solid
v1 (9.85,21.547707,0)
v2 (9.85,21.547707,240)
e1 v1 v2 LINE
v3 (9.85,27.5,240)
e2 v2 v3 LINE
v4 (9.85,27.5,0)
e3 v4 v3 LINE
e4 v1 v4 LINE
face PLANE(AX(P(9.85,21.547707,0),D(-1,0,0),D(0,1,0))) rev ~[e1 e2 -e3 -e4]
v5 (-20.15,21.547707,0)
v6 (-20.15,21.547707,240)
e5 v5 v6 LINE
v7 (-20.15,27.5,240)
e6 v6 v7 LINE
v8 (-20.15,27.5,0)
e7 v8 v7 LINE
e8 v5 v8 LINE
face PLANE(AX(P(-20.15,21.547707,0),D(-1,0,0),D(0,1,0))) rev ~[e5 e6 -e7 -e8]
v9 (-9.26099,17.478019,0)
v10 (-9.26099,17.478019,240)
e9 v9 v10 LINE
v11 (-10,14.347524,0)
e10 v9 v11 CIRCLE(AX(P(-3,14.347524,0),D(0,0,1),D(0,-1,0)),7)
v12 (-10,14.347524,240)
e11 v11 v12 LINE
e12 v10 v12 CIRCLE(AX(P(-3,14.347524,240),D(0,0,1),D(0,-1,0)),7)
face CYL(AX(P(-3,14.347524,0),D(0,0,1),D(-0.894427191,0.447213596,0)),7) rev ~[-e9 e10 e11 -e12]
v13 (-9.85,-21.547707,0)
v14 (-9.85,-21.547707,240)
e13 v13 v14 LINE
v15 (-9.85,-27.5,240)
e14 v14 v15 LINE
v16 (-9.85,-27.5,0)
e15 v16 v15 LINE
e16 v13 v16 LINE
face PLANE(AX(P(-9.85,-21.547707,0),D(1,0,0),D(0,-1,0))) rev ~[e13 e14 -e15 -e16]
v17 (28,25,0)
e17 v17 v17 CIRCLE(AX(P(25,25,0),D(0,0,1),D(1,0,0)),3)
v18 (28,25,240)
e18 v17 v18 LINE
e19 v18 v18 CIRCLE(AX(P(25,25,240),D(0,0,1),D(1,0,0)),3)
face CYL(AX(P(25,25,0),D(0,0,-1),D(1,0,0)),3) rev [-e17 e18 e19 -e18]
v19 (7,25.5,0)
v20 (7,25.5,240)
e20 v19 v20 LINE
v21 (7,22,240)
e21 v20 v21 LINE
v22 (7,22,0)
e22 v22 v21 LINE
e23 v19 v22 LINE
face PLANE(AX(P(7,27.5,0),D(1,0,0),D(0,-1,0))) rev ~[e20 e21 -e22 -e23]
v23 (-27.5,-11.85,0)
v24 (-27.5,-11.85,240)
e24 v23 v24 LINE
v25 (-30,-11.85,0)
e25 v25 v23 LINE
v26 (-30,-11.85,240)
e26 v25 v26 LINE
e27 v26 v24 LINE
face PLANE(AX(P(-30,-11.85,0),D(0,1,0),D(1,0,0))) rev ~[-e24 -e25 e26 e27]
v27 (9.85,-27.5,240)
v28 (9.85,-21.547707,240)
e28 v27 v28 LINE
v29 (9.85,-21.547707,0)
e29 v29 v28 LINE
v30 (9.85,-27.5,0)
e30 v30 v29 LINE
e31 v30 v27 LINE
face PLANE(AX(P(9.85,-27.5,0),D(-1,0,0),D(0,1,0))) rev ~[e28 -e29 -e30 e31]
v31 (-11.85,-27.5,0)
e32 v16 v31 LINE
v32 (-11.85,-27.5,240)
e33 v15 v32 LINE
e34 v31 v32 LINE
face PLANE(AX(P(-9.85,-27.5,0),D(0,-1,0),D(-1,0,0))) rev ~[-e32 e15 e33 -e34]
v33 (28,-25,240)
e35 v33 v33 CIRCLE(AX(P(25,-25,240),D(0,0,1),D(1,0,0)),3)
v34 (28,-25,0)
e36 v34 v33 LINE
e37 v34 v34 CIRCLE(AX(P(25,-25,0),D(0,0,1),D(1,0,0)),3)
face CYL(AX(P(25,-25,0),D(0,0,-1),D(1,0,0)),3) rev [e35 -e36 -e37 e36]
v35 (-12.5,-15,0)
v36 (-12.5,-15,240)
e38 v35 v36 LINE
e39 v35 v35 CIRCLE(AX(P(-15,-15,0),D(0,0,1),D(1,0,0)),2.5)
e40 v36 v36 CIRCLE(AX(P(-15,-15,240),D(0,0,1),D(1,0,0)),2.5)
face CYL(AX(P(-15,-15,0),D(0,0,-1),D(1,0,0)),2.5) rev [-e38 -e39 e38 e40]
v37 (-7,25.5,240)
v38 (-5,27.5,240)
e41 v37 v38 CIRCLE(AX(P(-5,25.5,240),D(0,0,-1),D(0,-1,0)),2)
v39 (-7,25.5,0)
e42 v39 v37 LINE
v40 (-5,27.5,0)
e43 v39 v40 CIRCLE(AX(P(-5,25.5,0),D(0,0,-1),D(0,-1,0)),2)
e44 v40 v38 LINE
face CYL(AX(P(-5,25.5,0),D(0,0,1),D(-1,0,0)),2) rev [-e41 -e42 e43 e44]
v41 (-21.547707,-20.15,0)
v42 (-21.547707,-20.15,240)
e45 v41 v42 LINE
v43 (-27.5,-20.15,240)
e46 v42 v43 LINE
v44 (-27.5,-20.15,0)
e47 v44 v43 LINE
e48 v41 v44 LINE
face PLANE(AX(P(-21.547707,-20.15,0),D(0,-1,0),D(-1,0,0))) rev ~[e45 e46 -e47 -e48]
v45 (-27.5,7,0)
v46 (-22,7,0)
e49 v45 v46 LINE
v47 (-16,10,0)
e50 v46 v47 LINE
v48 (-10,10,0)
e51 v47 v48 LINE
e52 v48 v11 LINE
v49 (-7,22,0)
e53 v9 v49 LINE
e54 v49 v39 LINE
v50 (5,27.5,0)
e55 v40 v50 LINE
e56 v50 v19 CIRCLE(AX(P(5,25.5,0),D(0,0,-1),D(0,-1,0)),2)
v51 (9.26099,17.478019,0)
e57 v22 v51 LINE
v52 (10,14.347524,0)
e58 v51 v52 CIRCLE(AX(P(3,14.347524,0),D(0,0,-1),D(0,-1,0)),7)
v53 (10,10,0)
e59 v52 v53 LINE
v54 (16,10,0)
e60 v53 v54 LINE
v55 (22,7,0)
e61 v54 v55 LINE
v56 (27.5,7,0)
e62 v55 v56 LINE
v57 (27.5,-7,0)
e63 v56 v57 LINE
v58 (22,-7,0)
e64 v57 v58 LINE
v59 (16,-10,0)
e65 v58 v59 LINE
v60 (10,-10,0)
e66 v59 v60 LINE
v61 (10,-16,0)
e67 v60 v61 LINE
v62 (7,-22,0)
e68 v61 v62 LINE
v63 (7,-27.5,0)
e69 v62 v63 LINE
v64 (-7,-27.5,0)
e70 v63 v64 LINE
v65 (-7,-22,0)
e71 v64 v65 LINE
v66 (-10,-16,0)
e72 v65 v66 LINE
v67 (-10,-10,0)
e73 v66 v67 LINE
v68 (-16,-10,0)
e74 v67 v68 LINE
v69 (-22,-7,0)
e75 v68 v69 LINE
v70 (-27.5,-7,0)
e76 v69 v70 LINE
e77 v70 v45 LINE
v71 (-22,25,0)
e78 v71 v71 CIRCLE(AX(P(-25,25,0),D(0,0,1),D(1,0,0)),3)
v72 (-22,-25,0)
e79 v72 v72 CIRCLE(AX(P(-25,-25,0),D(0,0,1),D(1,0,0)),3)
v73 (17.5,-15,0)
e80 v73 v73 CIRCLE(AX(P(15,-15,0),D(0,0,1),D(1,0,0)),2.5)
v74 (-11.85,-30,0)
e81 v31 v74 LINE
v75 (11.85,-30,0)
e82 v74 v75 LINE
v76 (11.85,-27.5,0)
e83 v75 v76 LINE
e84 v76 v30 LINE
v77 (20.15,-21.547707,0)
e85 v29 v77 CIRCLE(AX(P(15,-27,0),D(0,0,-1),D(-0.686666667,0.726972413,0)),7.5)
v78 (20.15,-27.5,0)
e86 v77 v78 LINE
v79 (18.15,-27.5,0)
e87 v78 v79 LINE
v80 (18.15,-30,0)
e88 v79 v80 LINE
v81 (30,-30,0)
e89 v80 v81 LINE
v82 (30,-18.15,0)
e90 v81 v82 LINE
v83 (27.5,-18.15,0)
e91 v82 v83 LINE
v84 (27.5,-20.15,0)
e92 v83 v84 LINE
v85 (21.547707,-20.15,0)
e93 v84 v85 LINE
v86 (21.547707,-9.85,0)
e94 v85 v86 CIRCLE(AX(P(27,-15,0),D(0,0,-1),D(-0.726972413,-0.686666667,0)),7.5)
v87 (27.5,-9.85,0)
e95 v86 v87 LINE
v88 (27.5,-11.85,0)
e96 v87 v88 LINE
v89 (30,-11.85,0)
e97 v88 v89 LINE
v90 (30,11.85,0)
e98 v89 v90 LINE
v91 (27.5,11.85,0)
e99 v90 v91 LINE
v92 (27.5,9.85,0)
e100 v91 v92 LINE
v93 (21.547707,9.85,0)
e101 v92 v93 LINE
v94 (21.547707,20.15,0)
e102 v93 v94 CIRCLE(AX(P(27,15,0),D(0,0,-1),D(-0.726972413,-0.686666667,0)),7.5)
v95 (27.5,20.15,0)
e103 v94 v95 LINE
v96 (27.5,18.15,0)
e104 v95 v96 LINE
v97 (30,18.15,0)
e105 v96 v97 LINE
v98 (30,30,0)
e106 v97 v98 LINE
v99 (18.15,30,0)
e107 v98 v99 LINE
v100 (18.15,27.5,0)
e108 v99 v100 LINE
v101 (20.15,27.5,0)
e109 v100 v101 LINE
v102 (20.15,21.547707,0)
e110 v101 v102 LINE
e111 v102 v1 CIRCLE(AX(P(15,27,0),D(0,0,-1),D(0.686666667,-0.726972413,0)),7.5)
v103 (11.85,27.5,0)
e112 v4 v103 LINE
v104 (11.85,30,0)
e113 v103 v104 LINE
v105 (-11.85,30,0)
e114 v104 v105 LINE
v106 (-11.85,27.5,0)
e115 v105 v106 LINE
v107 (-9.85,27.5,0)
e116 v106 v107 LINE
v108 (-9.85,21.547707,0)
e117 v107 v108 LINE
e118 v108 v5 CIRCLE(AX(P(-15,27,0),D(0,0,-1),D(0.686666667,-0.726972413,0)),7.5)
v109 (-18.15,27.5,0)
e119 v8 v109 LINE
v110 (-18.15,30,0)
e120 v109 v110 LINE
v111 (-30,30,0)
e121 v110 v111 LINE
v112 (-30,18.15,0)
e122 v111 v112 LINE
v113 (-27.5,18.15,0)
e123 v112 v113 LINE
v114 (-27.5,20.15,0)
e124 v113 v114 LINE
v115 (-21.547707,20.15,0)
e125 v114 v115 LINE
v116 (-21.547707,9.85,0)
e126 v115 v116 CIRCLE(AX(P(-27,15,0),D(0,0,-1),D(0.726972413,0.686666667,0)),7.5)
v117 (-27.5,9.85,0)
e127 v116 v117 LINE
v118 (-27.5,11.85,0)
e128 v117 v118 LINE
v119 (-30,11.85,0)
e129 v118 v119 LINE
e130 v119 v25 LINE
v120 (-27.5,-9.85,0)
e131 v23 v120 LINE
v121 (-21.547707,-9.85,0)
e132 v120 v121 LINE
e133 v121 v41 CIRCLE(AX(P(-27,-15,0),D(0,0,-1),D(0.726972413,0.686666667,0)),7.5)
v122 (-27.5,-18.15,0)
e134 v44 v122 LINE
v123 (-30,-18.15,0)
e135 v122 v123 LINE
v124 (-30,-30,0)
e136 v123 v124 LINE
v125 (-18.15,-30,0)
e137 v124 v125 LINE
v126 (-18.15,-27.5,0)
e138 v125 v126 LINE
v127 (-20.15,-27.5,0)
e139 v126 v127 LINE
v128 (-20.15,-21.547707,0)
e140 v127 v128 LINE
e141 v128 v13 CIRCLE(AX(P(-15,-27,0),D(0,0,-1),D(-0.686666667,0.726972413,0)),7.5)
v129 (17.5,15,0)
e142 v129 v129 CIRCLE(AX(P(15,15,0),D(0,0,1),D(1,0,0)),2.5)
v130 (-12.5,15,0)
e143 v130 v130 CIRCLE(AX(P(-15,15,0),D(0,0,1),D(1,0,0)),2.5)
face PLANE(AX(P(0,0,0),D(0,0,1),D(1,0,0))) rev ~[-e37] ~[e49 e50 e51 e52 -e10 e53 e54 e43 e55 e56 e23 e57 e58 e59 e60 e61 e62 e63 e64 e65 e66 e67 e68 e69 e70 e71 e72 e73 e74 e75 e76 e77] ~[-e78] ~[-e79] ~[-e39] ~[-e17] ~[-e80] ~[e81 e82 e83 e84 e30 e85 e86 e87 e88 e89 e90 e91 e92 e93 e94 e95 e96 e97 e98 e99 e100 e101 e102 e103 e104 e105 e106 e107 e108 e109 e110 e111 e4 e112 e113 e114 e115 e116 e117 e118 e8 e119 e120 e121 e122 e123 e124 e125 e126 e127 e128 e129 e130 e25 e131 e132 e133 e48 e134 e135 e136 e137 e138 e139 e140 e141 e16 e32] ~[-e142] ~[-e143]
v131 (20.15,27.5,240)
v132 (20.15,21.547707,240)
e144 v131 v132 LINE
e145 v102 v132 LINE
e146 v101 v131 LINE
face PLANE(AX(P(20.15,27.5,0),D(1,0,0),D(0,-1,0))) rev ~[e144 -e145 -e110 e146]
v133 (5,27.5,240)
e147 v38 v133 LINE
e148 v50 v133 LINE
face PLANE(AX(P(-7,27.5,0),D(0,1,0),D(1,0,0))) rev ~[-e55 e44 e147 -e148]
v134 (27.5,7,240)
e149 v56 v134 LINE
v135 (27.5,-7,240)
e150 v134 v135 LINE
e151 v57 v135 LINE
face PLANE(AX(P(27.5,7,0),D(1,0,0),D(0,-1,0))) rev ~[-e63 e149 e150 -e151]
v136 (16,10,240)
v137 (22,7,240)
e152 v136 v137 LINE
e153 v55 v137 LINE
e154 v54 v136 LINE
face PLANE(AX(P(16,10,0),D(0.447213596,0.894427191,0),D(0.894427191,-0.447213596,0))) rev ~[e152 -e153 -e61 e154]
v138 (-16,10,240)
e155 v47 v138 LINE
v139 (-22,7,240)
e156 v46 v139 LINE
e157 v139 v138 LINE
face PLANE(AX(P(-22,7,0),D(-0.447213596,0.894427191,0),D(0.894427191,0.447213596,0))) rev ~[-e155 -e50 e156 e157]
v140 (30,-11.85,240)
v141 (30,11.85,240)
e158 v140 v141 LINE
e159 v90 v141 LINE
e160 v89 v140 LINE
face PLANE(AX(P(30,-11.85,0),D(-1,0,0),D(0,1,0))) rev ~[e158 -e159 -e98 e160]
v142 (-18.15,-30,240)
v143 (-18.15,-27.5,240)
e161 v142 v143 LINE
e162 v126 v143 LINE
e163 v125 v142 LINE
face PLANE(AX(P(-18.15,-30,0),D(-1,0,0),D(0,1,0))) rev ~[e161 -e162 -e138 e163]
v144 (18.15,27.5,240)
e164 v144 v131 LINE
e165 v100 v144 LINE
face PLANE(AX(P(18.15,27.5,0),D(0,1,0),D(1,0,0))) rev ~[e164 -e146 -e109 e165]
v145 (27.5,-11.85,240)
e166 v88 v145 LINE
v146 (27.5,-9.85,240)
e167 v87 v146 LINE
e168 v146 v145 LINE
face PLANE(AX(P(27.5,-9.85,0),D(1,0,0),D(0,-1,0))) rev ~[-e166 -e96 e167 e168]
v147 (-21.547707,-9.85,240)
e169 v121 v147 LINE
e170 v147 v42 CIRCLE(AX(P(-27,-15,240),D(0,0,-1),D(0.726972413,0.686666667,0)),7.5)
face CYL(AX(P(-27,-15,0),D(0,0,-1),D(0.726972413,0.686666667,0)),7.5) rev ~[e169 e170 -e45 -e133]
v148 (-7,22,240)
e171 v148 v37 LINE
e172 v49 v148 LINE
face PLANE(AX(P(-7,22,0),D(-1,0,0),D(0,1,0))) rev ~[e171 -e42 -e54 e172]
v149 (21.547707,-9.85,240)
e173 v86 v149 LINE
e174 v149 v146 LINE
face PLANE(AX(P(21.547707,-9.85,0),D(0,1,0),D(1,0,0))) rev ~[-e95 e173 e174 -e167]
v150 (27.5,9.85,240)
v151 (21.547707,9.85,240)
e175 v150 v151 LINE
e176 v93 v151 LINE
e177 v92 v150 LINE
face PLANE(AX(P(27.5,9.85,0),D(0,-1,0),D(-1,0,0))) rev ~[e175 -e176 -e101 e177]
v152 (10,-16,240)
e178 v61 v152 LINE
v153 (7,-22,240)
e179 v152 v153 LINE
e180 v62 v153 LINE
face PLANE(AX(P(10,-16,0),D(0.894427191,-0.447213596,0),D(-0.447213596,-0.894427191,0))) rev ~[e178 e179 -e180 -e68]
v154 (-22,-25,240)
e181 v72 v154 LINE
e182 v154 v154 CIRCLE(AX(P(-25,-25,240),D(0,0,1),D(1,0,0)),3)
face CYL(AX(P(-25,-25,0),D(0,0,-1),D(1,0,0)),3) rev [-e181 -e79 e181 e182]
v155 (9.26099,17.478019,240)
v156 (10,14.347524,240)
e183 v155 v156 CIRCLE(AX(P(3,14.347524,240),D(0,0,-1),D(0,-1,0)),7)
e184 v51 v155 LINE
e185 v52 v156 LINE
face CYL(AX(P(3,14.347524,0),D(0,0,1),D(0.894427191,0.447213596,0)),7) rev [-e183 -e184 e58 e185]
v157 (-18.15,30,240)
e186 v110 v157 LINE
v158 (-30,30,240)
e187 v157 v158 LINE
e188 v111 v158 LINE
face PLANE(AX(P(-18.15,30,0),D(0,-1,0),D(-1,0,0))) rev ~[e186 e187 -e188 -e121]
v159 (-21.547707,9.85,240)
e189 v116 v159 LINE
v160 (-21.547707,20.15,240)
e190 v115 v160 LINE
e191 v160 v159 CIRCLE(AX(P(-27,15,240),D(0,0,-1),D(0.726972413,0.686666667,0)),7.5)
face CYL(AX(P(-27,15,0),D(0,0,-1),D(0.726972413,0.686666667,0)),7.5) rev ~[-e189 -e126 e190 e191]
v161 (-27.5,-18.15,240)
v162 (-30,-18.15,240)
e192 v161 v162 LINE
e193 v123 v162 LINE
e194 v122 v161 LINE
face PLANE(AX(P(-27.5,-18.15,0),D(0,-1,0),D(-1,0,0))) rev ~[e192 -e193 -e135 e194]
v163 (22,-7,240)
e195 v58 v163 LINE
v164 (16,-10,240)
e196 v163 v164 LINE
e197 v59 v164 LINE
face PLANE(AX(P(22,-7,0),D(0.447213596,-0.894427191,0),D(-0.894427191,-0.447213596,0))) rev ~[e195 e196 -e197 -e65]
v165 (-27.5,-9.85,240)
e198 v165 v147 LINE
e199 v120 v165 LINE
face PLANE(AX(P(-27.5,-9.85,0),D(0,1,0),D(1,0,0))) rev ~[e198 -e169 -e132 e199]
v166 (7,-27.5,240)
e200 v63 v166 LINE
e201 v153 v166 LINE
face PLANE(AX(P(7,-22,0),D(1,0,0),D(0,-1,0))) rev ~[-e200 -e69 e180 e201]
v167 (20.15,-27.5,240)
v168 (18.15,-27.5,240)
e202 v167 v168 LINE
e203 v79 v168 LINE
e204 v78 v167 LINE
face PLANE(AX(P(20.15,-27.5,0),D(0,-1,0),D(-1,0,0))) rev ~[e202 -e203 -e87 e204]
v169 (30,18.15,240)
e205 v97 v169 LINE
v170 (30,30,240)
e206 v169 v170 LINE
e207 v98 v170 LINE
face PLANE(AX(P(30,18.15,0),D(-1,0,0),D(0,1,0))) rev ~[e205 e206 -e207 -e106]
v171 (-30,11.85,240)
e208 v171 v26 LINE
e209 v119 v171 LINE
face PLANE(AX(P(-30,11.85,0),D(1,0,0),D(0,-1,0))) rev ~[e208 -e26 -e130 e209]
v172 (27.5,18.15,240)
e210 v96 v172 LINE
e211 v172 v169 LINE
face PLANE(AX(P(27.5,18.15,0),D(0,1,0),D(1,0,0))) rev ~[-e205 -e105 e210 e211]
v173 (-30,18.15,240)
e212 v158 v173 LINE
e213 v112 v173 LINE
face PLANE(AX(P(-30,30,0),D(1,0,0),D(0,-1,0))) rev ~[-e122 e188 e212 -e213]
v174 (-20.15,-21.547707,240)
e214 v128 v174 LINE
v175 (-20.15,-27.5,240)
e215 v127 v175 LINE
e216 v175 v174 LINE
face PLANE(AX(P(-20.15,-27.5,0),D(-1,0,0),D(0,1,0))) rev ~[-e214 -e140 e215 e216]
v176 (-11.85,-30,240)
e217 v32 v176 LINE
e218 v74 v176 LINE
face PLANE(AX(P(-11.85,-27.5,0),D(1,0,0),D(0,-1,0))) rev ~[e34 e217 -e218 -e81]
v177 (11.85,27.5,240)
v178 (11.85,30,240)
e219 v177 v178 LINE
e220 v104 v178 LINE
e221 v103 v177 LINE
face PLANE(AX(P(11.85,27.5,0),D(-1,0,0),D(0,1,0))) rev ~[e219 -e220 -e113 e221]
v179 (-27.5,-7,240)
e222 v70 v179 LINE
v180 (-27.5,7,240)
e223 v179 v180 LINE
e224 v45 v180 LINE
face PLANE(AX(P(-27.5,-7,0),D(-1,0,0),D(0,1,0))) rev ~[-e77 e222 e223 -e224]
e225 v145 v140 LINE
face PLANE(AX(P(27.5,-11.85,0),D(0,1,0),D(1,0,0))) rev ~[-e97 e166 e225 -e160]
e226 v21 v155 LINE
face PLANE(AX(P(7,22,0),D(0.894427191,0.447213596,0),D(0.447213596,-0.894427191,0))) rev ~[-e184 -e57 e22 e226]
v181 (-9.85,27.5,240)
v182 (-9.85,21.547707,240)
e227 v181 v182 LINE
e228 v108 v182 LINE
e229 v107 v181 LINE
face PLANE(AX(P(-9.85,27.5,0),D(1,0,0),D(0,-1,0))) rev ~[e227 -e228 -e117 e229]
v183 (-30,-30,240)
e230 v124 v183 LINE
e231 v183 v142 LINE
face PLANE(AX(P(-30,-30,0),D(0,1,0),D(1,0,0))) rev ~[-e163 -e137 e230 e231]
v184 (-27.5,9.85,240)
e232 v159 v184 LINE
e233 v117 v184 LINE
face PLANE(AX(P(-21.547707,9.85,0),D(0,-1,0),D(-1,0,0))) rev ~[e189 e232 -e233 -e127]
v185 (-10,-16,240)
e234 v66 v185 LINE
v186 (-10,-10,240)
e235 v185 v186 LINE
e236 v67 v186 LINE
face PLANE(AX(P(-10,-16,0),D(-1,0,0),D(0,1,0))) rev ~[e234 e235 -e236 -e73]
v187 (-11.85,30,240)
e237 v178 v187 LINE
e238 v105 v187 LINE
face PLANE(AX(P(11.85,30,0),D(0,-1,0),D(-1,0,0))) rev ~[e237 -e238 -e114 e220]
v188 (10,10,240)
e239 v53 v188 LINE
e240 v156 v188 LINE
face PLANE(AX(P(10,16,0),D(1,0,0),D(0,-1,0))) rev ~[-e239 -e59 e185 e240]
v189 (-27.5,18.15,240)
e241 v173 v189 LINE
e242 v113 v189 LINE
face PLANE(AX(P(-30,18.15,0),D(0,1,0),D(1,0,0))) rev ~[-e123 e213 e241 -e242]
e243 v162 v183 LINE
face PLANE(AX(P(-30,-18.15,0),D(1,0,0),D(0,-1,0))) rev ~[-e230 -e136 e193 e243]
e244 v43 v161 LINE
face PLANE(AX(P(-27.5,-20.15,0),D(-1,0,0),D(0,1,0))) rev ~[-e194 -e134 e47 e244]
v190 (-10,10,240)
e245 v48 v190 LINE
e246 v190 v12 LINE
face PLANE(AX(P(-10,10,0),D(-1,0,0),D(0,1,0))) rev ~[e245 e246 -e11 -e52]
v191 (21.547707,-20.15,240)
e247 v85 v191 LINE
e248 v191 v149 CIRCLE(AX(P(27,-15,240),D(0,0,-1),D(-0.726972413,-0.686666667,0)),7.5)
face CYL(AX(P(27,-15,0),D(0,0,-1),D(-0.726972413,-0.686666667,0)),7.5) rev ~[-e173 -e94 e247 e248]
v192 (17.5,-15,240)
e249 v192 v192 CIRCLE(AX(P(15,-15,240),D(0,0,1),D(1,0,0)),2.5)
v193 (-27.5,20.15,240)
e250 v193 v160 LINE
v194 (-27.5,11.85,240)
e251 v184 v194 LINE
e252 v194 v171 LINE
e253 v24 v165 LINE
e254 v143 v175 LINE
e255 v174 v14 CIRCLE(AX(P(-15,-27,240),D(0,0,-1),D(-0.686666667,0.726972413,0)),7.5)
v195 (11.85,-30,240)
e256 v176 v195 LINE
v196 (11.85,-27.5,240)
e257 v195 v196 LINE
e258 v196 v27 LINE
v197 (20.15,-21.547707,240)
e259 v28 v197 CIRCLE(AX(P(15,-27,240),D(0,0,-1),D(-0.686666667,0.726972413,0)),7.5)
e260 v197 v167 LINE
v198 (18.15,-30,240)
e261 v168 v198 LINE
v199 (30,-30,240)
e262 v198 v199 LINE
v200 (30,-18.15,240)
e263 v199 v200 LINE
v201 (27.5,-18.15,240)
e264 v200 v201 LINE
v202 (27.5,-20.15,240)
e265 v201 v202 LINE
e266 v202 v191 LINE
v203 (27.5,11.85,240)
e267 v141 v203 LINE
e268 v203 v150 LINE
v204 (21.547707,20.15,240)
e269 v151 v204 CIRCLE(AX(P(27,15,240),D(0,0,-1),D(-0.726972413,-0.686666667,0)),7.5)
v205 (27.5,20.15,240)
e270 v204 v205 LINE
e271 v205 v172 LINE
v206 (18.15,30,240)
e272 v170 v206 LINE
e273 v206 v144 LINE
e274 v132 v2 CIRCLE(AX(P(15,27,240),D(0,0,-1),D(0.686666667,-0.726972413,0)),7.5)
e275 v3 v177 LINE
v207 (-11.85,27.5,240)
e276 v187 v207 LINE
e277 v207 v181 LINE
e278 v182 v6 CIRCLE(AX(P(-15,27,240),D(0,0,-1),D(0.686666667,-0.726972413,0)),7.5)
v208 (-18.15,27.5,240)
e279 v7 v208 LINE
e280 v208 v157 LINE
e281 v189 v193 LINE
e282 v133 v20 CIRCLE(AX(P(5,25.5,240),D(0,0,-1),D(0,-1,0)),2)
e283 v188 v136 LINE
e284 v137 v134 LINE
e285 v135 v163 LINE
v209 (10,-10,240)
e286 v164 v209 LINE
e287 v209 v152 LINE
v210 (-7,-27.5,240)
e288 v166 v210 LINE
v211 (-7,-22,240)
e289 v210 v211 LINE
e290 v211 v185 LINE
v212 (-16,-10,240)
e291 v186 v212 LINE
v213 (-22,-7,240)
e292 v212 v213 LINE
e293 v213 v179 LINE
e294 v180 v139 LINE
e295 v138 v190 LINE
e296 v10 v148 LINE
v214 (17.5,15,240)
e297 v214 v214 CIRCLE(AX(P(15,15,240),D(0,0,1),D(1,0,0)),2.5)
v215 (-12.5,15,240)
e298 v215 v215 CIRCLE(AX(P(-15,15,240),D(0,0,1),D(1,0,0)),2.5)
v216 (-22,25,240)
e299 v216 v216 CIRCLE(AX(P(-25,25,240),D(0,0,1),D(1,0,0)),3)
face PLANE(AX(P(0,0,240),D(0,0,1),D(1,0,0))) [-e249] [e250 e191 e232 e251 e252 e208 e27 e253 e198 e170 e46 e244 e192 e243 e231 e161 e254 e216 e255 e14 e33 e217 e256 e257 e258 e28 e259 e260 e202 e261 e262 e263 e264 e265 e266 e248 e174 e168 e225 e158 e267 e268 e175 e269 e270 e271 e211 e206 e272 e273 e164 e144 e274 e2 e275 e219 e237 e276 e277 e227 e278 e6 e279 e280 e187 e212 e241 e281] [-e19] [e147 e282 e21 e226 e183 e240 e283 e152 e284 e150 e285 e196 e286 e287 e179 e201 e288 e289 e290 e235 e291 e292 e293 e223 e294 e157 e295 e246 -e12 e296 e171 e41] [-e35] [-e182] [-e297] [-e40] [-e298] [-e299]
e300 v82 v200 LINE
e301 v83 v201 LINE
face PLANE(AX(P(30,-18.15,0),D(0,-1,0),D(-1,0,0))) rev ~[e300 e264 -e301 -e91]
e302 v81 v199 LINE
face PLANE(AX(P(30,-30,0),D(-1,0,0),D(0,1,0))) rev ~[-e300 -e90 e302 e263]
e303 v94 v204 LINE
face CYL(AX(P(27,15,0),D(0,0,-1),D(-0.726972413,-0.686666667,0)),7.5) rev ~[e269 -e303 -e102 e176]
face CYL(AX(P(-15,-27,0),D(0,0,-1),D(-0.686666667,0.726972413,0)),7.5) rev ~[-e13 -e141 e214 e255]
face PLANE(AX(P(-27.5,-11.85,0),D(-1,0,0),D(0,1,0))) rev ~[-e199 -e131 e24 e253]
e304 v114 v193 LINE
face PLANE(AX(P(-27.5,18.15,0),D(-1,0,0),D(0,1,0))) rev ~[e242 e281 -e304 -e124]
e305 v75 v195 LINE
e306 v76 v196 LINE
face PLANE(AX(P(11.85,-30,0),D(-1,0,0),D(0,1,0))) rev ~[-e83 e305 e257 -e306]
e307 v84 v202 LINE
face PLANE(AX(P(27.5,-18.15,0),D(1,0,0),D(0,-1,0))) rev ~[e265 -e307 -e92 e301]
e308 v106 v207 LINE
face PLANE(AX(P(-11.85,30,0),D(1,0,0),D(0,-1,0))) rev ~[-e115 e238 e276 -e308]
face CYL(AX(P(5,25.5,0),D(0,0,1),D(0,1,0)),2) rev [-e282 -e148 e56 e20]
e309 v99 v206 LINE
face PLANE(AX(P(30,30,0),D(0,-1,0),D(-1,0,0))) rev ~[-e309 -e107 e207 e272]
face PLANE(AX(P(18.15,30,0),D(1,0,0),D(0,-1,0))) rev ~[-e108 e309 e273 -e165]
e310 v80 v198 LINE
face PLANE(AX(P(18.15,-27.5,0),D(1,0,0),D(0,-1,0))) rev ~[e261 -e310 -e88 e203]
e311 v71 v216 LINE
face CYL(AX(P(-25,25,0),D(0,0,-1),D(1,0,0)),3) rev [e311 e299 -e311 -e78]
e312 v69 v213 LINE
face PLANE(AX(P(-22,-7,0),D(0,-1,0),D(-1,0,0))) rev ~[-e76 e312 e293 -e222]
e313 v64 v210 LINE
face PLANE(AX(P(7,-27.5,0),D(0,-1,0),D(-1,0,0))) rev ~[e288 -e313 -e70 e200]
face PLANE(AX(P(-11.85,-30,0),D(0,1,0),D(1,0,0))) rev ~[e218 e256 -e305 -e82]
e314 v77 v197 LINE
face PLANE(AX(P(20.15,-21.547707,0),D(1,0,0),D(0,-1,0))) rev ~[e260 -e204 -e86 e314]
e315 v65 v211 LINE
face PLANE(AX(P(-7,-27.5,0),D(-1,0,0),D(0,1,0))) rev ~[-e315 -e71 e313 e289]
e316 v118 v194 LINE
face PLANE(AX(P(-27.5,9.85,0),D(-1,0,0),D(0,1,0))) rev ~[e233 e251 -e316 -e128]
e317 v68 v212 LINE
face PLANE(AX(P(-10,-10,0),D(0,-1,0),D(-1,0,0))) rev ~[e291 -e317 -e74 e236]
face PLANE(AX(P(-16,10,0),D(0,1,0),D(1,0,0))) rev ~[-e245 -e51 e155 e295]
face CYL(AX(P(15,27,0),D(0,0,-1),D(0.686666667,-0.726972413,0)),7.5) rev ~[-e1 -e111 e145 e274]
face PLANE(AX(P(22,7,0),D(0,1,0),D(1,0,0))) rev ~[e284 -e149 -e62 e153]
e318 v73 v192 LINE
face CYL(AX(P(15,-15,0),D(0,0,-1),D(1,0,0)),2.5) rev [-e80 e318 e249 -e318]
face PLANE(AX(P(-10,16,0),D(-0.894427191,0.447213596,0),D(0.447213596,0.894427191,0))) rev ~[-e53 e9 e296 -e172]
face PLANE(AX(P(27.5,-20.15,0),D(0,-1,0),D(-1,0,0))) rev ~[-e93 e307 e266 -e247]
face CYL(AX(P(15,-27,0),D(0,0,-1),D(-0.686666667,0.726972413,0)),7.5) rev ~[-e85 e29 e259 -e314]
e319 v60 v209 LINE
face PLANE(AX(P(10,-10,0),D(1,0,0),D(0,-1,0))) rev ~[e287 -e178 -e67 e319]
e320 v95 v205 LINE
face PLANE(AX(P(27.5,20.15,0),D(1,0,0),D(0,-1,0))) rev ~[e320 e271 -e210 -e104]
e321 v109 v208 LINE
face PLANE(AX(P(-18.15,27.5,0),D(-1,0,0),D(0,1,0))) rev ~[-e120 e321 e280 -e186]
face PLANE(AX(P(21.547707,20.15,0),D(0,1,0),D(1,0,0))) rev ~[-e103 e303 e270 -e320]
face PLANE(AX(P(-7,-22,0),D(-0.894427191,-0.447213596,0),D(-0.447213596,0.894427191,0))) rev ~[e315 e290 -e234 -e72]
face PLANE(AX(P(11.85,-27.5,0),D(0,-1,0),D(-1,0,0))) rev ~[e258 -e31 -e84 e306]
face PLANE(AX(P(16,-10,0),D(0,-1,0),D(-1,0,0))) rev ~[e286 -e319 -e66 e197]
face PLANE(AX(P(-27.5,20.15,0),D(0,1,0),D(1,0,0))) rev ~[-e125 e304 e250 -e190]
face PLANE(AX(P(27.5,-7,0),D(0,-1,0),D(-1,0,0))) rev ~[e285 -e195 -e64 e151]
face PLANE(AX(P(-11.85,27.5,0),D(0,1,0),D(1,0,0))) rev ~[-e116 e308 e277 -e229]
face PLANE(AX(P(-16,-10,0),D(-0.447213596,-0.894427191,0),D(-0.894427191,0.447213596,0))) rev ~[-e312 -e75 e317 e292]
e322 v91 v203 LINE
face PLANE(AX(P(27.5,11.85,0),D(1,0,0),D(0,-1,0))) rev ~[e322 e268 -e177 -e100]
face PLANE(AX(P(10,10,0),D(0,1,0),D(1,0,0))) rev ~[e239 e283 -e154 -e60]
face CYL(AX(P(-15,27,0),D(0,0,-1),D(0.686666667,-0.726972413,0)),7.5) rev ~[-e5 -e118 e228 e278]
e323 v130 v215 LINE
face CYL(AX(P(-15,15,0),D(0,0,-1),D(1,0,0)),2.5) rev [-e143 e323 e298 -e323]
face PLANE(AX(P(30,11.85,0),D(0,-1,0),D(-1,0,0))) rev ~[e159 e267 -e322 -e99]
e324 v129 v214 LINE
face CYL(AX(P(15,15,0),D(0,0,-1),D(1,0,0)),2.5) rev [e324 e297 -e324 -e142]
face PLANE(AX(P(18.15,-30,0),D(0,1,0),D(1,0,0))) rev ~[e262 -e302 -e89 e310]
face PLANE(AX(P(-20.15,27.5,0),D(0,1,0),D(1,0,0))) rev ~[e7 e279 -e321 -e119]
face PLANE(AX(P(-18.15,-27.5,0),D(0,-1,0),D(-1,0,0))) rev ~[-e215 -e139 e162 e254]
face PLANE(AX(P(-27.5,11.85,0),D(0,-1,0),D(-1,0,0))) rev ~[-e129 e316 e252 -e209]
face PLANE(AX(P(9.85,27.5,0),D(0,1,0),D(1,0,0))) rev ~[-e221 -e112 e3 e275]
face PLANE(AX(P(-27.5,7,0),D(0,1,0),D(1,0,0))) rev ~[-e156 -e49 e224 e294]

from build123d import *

# Parameters (mm, degrees)
F0_R     = 3
F0_R_2   = 2.5
F1_DEPTH = 240
F2_R     = 2
F3_R     = 7


# Not quite as in the source:
# - a feature names something its author has since deleted; it is built from what else it names


with BuildPart() as f1:
    # F0 (on Top) → F1 (new body)
    with BuildSketch(Plane.XY):
        with BuildLine():
            Line((18.15, -30), (30, -30))
            Line((30, -30), (30, -18.15))
            Line((30, -18.15), (27.5, -18.15))
            Line((27.5, -18.15), (27.5, -20.15))
            Line((27.5, -20.15), (21.5477069044, -20.15))
            ThreePointArc((21.5477069044, -20.15), (19.5, -15), (21.5477069044, -9.85))
            Line((21.5477069044, -9.85), (27.5, -9.85))
            Line((27.5, -9.85), (27.5, -11.85))
            Line((27.5, -11.85), (30, -11.85))
            Line((30, -11.85), (30, 11.85))
            Line((30, 11.85), (27.5, 11.85))
            Line((27.5, 11.85), (27.5, 9.85))
            Line((27.5, 9.85), (21.5477069044, 9.85))
            ThreePointArc((21.5477069044, 9.85), (19.5, 15), (21.5477069044, 20.15))
            Line((21.5477069044, 20.15), (27.5, 20.15))
            Line((27.5, 20.15), (27.5, 18.15))
            Line((27.5, 18.15), (30, 18.15))
            Line((30, 18.15), (30, 30))
            Line((30, 30), (18.15, 30))
            Line((18.15, 30), (18.15, 27.5))
            Line((18.15, 27.5), (20.15, 27.5))
            Line((20.15, 27.5), (20.15, 21.5477069044))
            ThreePointArc((20.15, 21.5477069044), (15, 19.5), (9.85, 21.5477069044))
            Line((9.85, 21.5477069044), (9.85, 27.5))
            Line((9.85, 27.5), (11.85, 27.5))
            Line((11.85, 27.5), (11.85, 30))
            Line((11.85, 30), (-11.85, 30))
            Line((-11.85, 30), (-11.85, 27.5))
            Line((-11.85, 27.5), (-9.85, 27.5))
            Line((-9.85, 27.5), (-9.85, 21.5477069044))
            ThreePointArc((-9.85, 21.5477069044), (-15, 19.5), (-20.15, 21.5477069044))
            Line((-20.15, 21.5477069044), (-20.15, 27.5))
            Line((-20.15, 27.5), (-18.15, 27.5))
            Line((-18.15, 27.5), (-18.15, 30))
            Line((-18.15, 30), (-30, 30))
            Line((-30, 30), (-30, 18.15))
            Line((-30, 18.15), (-27.5, 18.15))
            Line((-27.5, 18.15), (-27.5, 20.15))
            Line((-27.5, 20.15), (-21.5477069044, 20.15))
            ThreePointArc((-21.5477069044, 20.15), (-19.5, 15), (-21.5477069044, 9.85))
            Line((-21.5477069044, 9.85), (-27.5, 9.85))
            Line((-27.5, 9.85), (-27.5, 11.85))
            Line((-27.5, 11.85), (-30, 11.85))
            Line((-30, 11.85), (-30, -11.85))
            Line((-30, -11.85), (-27.5, -11.85))
            Line((-27.5, -11.85), (-27.5, -9.85))
            Line((-27.5, -9.85), (-21.5477069044, -9.85))
            ThreePointArc((-21.5477069044, -9.85), (-19.5, -15), (-21.5477069044, -20.15))
            Line((-21.5477069044, -20.15), (-27.5, -20.15))
            Line((-27.5, -20.15), (-27.5, -18.15))
            Line((-27.5, -18.15), (-30, -18.15))
            Line((-30, -18.15), (-30, -30))
            Line((-30, -30), (-18.15, -30))
            Line((-18.15, -30), (-18.15, -27.5))
            Line((-18.15, -27.5), (-20.15, -27.5))
            Line((-20.15, -27.5), (-20.15, -21.5477069044))
            ThreePointArc((-20.15, -21.5477069044), (-15, -19.5), (-9.85, -21.5477069044))
            Line((-9.85, -21.5477069044), (-9.85, -27.5))
            Line((-9.85, -27.5), (-11.85, -27.5))
            Line((-11.85, -27.5), (-11.85, -30))
            Line((-11.85, -30), (11.85, -30))
            Line((11.85, -30), (11.85, -27.5))
            Line((11.85, -27.5), (9.85, -27.5))
            Line((9.85, -27.5), (9.85, -21.5477069044))
            ThreePointArc((9.85, -21.5477069044), (15, -19.5), (20.15, -21.5477069044))
            Line((20.15, -21.5477069044), (20.15, -27.5))
            Line((20.15, -27.5), (18.15, -27.5))
            Line((18.15, -27.5), (18.15, -30))
        make_face()
        with Locations((-25, -25)):
            Circle(F0_R, mode=Mode.SUBTRACT)
        with Locations((-15, -15)):
            Circle(F0_R_2, mode=Mode.SUBTRACT)
        with Locations((25, -25)):
            Circle(F0_R, mode=Mode.SUBTRACT)
        with Locations((15, -15)):
            Circle(F0_R_2, mode=Mode.SUBTRACT)
        with Locations((-25, 25)):
            Circle(F0_R, mode=Mode.SUBTRACT)
        with Locations((-15, 15)):
            Circle(F0_R_2, mode=Mode.SUBTRACT)
        Polygon((-7, 22), (-7, 27.5), (0, 27.5), (7, 27.5), (7, 22), (10, 16), (10, 10), (16, 10), (22, 7), (27.5, 7), (27.5, 0), (27.5, -7), (22, -7), (16, -10), (10, -10), (10, -16), (7, -22), (7, -27.5), (0, -27.5), (-7, -27.5), (-7, -22), (-10, -16), (-10, -10), (-16, -10), (-22, -7), (-27.5, -7), (-27.5, 0), (-27.5, 7), (-22, 7), (-16, 10), (-10, 10), (-10, 16), align=None, mode=Mode.SUBTRACT)
        with Locations((15, 15)):
            Circle(F0_R_2, mode=Mode.SUBTRACT)
        with Locations((25, 25)):
            Circle(F0_R, mode=Mode.SUBTRACT)
    extrude(amount=F1_DEPTH)

    # F2
    f2_edges = [f1.edges().sort_by_distance(p)[0] for p in [
        (-7, 27.5, 120),
        (7, 27.5, 120),
    ]]
    fillet(f2_edges, radius=F2_R)

    # F3
    f3_edges = [f1.edges().sort_by_distance(p)[0] for p in [
        (-10, 16, 120),
        (10, 16, 120),
    ]]
    fillet(f3_edges, radius=F3_R)


solid = f1.part
